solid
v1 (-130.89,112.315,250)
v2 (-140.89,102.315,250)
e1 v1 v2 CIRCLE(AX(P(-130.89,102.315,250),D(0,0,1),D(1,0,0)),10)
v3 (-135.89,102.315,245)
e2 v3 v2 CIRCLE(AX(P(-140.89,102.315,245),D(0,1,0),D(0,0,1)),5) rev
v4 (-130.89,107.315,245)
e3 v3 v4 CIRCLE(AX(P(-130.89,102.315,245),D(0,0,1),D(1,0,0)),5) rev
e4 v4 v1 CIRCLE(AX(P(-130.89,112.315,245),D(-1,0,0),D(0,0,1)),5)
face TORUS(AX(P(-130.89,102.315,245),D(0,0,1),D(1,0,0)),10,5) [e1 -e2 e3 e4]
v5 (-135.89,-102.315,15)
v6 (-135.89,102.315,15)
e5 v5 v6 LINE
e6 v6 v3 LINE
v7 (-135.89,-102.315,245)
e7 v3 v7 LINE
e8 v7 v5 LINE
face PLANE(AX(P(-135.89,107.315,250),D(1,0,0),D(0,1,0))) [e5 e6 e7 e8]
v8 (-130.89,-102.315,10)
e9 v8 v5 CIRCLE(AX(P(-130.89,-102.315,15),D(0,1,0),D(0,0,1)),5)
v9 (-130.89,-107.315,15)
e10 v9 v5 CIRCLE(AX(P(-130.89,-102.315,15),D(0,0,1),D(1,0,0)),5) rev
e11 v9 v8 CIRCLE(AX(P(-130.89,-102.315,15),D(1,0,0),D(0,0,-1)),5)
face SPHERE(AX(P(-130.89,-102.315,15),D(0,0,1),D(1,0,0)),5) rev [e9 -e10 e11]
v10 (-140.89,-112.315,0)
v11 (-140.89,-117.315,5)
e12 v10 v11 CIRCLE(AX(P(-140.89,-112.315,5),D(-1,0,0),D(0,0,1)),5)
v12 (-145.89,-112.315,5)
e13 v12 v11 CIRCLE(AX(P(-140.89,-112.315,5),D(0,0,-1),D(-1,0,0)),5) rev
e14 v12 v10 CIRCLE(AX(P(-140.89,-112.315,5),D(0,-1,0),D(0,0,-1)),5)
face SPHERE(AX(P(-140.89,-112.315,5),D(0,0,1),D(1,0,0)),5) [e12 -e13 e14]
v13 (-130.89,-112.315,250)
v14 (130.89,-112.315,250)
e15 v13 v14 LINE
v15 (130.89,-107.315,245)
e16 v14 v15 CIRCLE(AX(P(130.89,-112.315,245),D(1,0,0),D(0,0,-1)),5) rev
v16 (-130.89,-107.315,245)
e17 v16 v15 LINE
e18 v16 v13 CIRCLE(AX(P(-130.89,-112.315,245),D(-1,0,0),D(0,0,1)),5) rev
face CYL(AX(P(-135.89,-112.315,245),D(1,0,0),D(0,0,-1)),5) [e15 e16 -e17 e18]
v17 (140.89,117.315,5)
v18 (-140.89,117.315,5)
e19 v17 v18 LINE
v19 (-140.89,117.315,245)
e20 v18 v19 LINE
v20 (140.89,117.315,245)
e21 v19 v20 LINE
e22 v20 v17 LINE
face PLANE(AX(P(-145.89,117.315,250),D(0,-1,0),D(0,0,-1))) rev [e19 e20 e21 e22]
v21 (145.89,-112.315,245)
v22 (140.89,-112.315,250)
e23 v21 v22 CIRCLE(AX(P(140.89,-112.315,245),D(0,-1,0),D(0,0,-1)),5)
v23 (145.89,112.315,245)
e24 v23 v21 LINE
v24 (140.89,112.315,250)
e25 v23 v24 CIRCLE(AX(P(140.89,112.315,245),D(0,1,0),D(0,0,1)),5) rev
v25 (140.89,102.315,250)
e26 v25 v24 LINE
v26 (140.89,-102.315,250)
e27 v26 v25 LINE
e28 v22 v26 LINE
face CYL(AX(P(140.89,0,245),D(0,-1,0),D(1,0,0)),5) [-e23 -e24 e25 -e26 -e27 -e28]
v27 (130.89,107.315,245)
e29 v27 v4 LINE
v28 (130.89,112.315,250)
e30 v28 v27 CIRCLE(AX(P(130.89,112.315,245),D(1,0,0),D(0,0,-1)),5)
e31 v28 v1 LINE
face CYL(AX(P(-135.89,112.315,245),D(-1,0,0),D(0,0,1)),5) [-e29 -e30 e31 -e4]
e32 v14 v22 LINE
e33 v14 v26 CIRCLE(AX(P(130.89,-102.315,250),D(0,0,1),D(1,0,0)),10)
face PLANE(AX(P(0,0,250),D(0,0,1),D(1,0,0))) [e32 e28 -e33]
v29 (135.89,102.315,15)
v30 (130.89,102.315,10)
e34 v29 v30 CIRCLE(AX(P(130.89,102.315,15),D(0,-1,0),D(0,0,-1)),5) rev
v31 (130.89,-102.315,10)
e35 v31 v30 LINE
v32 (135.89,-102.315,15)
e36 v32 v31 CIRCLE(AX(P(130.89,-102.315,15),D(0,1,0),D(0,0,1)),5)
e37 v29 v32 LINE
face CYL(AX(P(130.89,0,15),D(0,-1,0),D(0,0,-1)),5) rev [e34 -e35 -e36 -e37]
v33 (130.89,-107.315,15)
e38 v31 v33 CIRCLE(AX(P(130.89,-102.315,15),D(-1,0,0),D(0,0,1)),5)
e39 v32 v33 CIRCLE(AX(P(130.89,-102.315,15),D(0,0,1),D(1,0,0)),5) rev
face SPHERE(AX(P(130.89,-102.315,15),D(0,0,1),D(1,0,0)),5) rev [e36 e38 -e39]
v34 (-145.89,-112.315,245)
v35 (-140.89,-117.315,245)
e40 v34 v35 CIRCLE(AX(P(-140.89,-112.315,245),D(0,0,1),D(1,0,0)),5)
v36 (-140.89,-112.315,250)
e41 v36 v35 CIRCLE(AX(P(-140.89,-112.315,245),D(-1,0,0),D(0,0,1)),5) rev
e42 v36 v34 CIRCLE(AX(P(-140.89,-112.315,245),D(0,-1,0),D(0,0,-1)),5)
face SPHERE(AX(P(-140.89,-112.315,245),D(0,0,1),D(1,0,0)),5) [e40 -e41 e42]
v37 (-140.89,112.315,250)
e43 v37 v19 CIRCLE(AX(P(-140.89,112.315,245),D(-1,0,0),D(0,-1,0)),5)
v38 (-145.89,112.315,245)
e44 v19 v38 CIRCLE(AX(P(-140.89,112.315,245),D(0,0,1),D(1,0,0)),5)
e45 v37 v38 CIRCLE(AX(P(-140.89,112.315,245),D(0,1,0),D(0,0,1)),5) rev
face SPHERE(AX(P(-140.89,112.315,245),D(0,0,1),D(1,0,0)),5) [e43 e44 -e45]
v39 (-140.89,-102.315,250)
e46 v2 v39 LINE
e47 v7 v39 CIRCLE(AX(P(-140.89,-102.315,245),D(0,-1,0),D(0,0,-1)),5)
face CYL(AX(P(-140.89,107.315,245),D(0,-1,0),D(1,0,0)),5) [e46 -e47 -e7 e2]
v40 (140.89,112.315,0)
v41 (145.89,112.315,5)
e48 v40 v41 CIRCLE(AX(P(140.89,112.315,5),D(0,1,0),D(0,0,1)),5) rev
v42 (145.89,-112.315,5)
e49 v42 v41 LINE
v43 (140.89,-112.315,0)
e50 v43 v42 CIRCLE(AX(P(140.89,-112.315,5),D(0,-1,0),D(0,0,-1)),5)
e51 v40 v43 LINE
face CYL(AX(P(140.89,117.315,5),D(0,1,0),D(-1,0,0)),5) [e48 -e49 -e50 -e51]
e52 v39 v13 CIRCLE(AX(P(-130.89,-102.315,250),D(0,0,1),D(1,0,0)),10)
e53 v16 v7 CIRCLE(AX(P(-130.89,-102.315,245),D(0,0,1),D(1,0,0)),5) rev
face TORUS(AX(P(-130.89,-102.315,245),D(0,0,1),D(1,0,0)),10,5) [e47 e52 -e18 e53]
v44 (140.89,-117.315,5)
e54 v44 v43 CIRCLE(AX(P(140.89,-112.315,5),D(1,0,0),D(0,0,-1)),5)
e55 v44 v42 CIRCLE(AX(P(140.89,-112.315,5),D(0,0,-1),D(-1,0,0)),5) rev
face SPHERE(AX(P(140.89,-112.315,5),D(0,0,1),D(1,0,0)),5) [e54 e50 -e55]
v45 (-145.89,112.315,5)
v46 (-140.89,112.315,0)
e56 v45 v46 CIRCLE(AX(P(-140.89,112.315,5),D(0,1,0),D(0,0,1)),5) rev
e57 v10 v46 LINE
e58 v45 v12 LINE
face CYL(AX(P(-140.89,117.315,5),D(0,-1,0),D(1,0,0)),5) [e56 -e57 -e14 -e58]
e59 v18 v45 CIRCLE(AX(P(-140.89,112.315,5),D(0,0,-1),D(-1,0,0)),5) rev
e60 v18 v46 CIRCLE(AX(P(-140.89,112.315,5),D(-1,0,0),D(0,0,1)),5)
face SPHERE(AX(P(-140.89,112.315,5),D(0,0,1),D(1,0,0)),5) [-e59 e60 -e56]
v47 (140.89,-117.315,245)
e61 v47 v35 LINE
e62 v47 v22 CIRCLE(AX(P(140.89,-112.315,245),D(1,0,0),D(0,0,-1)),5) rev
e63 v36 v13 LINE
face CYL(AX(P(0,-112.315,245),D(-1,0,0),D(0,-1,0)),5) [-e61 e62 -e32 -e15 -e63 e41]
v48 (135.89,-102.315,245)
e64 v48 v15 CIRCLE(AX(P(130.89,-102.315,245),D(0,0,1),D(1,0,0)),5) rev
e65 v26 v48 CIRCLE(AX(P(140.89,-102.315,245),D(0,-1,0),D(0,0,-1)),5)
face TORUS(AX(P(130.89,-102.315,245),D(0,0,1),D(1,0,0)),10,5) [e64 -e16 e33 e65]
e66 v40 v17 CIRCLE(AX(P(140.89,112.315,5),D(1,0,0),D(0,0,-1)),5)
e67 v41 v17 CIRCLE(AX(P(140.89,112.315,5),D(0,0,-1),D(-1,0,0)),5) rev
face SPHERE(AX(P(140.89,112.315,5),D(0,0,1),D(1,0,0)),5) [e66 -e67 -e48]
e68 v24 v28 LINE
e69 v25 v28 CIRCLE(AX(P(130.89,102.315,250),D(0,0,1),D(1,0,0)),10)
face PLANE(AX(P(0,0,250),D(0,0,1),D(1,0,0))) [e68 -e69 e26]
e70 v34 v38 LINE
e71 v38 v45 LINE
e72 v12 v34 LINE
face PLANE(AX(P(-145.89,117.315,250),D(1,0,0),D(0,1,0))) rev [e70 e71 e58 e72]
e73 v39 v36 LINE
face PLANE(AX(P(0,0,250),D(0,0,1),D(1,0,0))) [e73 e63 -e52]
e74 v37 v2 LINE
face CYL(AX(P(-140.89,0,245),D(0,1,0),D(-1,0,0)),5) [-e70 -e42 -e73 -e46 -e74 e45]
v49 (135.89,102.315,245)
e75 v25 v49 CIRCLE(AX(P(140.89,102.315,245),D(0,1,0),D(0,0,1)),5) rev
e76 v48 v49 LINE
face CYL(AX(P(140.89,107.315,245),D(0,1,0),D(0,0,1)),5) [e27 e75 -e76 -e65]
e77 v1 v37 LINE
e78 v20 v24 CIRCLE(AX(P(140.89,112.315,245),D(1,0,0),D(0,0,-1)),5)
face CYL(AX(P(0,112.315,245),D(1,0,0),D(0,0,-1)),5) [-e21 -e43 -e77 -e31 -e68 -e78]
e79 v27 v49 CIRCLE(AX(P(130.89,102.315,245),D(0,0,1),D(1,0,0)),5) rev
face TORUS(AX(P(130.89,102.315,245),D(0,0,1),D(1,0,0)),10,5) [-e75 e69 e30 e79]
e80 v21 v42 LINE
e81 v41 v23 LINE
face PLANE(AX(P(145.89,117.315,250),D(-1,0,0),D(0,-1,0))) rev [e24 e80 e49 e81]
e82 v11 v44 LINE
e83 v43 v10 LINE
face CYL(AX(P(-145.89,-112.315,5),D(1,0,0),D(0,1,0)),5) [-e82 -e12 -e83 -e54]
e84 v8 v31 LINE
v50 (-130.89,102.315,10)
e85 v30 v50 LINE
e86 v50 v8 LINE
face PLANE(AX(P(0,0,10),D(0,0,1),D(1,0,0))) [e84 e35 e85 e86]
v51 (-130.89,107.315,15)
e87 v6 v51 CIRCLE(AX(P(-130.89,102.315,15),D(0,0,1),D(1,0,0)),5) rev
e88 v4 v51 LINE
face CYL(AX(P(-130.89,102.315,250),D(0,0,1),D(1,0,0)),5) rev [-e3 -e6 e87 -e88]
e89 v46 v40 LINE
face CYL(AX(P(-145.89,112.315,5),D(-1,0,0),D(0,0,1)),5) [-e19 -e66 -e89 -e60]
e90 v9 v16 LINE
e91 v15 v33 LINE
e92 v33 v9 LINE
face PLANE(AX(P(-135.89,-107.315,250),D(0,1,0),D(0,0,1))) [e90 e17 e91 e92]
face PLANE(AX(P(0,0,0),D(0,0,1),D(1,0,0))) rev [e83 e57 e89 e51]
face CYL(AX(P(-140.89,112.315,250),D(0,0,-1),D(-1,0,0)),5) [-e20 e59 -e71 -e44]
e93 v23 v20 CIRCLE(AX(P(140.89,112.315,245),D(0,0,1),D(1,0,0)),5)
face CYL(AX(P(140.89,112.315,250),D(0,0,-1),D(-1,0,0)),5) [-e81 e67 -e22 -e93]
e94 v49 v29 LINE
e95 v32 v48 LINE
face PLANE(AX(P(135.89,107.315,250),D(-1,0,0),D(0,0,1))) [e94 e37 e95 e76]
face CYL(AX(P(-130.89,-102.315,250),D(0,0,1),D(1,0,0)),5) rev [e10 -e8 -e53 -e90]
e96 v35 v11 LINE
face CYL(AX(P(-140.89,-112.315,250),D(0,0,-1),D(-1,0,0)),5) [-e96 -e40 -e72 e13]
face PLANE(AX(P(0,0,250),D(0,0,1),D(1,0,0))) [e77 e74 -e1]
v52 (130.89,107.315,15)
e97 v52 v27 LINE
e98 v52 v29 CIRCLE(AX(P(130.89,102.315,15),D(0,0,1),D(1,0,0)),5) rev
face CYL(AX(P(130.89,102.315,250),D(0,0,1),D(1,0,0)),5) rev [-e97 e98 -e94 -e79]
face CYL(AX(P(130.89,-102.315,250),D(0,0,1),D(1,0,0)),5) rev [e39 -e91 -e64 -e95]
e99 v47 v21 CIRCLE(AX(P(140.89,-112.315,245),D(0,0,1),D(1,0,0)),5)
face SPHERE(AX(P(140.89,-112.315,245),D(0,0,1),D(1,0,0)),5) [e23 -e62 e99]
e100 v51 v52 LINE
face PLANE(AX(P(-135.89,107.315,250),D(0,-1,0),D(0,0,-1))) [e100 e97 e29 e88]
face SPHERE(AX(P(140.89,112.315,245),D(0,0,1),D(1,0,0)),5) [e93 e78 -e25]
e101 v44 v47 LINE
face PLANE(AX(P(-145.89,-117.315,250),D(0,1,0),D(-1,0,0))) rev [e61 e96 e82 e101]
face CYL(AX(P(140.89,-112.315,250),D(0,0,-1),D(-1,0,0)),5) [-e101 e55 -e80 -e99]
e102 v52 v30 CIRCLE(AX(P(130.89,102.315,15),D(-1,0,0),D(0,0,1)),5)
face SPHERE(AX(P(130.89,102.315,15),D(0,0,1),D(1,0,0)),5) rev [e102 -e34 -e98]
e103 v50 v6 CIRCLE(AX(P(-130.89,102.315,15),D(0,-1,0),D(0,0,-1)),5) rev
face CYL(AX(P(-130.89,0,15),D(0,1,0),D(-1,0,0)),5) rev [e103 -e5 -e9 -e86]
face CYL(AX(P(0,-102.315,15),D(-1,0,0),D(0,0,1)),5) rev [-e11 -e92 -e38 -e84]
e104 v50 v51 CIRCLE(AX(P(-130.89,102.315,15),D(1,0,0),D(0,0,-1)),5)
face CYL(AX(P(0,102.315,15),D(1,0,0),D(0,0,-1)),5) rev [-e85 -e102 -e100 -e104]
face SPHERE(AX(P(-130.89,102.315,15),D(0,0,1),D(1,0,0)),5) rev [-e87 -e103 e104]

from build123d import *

# Parameters (mm, degrees)
CROQUIS1_W              = 291.78
CROQUIS1_H              = 234.63
CROQUIS1_W_2            = 271.78
CROQUIS1_H_2            = 214.63
SALIENTE_EXTRUIR1_DEPTH = 250
CROQUIS2_W              = 291.78
CROQUIS2_H              = 234.63
SALIENTE_EXTRUIR2_DEPTH = 10
REDONDEO1_R             = 5


with BuildPart() as part:
    # Croquis1 → Saliente-Extruir1 (new body)
    with BuildSketch(Plane.XY):
        Rectangle(CROQUIS1_W, CROQUIS1_H)
        Rectangle(CROQUIS1_W_2, CROQUIS1_H_2, mode=Mode.SUBTRACT)
    extrude(amount=SALIENTE_EXTRUIR1_DEPTH)

    # Croquis2 → Saliente-Extruir2 (add)
    with BuildSketch(Plane.XY):
        Rectangle(CROQUIS2_W, CROQUIS2_H)
    extrude(amount=SALIENTE_EXTRUIR2_DEPTH)

    # Redondeo1
    redondeo1_edges = [part.edges().sort_by_distance(p)[0] for p in [
        (145.89, 0, 250),
        (-135.89, 107.315, 130),
        (-135.89, -107.315, 130),
        (135.89, -107.315, 130),
        (135.89, 107.315, 130),
        (-135.89, 0, 250),
        (0, 117.315, 250),
        (0, -107.315, 250),
        (135.89, 0, 250),
        (0, 107.315, 250),
        (0, 107.315, 10),
        (-135.89, 0, 10),
        (0, -107.315, 10),
        (135.89, 0, 10),
        (-145.89, 0, 250),
        (0, 117.315, 0),
        (145.89, 0, 0),
        (0, -117.315, 0),
        (-145.89, 0, 0),
        (-145.89, 117.315, 125),
        (145.89, 117.315, 125),
        (145.89, -117.315, 125),
        (-145.89, -117.315, 125),
        (0, -117.315, 250),
    ]]
    fillet(redondeo1_edges, radius=REDONDEO1_R - 0.0001)  # a hair under: the kernel refuses the full size


solid = part.part
